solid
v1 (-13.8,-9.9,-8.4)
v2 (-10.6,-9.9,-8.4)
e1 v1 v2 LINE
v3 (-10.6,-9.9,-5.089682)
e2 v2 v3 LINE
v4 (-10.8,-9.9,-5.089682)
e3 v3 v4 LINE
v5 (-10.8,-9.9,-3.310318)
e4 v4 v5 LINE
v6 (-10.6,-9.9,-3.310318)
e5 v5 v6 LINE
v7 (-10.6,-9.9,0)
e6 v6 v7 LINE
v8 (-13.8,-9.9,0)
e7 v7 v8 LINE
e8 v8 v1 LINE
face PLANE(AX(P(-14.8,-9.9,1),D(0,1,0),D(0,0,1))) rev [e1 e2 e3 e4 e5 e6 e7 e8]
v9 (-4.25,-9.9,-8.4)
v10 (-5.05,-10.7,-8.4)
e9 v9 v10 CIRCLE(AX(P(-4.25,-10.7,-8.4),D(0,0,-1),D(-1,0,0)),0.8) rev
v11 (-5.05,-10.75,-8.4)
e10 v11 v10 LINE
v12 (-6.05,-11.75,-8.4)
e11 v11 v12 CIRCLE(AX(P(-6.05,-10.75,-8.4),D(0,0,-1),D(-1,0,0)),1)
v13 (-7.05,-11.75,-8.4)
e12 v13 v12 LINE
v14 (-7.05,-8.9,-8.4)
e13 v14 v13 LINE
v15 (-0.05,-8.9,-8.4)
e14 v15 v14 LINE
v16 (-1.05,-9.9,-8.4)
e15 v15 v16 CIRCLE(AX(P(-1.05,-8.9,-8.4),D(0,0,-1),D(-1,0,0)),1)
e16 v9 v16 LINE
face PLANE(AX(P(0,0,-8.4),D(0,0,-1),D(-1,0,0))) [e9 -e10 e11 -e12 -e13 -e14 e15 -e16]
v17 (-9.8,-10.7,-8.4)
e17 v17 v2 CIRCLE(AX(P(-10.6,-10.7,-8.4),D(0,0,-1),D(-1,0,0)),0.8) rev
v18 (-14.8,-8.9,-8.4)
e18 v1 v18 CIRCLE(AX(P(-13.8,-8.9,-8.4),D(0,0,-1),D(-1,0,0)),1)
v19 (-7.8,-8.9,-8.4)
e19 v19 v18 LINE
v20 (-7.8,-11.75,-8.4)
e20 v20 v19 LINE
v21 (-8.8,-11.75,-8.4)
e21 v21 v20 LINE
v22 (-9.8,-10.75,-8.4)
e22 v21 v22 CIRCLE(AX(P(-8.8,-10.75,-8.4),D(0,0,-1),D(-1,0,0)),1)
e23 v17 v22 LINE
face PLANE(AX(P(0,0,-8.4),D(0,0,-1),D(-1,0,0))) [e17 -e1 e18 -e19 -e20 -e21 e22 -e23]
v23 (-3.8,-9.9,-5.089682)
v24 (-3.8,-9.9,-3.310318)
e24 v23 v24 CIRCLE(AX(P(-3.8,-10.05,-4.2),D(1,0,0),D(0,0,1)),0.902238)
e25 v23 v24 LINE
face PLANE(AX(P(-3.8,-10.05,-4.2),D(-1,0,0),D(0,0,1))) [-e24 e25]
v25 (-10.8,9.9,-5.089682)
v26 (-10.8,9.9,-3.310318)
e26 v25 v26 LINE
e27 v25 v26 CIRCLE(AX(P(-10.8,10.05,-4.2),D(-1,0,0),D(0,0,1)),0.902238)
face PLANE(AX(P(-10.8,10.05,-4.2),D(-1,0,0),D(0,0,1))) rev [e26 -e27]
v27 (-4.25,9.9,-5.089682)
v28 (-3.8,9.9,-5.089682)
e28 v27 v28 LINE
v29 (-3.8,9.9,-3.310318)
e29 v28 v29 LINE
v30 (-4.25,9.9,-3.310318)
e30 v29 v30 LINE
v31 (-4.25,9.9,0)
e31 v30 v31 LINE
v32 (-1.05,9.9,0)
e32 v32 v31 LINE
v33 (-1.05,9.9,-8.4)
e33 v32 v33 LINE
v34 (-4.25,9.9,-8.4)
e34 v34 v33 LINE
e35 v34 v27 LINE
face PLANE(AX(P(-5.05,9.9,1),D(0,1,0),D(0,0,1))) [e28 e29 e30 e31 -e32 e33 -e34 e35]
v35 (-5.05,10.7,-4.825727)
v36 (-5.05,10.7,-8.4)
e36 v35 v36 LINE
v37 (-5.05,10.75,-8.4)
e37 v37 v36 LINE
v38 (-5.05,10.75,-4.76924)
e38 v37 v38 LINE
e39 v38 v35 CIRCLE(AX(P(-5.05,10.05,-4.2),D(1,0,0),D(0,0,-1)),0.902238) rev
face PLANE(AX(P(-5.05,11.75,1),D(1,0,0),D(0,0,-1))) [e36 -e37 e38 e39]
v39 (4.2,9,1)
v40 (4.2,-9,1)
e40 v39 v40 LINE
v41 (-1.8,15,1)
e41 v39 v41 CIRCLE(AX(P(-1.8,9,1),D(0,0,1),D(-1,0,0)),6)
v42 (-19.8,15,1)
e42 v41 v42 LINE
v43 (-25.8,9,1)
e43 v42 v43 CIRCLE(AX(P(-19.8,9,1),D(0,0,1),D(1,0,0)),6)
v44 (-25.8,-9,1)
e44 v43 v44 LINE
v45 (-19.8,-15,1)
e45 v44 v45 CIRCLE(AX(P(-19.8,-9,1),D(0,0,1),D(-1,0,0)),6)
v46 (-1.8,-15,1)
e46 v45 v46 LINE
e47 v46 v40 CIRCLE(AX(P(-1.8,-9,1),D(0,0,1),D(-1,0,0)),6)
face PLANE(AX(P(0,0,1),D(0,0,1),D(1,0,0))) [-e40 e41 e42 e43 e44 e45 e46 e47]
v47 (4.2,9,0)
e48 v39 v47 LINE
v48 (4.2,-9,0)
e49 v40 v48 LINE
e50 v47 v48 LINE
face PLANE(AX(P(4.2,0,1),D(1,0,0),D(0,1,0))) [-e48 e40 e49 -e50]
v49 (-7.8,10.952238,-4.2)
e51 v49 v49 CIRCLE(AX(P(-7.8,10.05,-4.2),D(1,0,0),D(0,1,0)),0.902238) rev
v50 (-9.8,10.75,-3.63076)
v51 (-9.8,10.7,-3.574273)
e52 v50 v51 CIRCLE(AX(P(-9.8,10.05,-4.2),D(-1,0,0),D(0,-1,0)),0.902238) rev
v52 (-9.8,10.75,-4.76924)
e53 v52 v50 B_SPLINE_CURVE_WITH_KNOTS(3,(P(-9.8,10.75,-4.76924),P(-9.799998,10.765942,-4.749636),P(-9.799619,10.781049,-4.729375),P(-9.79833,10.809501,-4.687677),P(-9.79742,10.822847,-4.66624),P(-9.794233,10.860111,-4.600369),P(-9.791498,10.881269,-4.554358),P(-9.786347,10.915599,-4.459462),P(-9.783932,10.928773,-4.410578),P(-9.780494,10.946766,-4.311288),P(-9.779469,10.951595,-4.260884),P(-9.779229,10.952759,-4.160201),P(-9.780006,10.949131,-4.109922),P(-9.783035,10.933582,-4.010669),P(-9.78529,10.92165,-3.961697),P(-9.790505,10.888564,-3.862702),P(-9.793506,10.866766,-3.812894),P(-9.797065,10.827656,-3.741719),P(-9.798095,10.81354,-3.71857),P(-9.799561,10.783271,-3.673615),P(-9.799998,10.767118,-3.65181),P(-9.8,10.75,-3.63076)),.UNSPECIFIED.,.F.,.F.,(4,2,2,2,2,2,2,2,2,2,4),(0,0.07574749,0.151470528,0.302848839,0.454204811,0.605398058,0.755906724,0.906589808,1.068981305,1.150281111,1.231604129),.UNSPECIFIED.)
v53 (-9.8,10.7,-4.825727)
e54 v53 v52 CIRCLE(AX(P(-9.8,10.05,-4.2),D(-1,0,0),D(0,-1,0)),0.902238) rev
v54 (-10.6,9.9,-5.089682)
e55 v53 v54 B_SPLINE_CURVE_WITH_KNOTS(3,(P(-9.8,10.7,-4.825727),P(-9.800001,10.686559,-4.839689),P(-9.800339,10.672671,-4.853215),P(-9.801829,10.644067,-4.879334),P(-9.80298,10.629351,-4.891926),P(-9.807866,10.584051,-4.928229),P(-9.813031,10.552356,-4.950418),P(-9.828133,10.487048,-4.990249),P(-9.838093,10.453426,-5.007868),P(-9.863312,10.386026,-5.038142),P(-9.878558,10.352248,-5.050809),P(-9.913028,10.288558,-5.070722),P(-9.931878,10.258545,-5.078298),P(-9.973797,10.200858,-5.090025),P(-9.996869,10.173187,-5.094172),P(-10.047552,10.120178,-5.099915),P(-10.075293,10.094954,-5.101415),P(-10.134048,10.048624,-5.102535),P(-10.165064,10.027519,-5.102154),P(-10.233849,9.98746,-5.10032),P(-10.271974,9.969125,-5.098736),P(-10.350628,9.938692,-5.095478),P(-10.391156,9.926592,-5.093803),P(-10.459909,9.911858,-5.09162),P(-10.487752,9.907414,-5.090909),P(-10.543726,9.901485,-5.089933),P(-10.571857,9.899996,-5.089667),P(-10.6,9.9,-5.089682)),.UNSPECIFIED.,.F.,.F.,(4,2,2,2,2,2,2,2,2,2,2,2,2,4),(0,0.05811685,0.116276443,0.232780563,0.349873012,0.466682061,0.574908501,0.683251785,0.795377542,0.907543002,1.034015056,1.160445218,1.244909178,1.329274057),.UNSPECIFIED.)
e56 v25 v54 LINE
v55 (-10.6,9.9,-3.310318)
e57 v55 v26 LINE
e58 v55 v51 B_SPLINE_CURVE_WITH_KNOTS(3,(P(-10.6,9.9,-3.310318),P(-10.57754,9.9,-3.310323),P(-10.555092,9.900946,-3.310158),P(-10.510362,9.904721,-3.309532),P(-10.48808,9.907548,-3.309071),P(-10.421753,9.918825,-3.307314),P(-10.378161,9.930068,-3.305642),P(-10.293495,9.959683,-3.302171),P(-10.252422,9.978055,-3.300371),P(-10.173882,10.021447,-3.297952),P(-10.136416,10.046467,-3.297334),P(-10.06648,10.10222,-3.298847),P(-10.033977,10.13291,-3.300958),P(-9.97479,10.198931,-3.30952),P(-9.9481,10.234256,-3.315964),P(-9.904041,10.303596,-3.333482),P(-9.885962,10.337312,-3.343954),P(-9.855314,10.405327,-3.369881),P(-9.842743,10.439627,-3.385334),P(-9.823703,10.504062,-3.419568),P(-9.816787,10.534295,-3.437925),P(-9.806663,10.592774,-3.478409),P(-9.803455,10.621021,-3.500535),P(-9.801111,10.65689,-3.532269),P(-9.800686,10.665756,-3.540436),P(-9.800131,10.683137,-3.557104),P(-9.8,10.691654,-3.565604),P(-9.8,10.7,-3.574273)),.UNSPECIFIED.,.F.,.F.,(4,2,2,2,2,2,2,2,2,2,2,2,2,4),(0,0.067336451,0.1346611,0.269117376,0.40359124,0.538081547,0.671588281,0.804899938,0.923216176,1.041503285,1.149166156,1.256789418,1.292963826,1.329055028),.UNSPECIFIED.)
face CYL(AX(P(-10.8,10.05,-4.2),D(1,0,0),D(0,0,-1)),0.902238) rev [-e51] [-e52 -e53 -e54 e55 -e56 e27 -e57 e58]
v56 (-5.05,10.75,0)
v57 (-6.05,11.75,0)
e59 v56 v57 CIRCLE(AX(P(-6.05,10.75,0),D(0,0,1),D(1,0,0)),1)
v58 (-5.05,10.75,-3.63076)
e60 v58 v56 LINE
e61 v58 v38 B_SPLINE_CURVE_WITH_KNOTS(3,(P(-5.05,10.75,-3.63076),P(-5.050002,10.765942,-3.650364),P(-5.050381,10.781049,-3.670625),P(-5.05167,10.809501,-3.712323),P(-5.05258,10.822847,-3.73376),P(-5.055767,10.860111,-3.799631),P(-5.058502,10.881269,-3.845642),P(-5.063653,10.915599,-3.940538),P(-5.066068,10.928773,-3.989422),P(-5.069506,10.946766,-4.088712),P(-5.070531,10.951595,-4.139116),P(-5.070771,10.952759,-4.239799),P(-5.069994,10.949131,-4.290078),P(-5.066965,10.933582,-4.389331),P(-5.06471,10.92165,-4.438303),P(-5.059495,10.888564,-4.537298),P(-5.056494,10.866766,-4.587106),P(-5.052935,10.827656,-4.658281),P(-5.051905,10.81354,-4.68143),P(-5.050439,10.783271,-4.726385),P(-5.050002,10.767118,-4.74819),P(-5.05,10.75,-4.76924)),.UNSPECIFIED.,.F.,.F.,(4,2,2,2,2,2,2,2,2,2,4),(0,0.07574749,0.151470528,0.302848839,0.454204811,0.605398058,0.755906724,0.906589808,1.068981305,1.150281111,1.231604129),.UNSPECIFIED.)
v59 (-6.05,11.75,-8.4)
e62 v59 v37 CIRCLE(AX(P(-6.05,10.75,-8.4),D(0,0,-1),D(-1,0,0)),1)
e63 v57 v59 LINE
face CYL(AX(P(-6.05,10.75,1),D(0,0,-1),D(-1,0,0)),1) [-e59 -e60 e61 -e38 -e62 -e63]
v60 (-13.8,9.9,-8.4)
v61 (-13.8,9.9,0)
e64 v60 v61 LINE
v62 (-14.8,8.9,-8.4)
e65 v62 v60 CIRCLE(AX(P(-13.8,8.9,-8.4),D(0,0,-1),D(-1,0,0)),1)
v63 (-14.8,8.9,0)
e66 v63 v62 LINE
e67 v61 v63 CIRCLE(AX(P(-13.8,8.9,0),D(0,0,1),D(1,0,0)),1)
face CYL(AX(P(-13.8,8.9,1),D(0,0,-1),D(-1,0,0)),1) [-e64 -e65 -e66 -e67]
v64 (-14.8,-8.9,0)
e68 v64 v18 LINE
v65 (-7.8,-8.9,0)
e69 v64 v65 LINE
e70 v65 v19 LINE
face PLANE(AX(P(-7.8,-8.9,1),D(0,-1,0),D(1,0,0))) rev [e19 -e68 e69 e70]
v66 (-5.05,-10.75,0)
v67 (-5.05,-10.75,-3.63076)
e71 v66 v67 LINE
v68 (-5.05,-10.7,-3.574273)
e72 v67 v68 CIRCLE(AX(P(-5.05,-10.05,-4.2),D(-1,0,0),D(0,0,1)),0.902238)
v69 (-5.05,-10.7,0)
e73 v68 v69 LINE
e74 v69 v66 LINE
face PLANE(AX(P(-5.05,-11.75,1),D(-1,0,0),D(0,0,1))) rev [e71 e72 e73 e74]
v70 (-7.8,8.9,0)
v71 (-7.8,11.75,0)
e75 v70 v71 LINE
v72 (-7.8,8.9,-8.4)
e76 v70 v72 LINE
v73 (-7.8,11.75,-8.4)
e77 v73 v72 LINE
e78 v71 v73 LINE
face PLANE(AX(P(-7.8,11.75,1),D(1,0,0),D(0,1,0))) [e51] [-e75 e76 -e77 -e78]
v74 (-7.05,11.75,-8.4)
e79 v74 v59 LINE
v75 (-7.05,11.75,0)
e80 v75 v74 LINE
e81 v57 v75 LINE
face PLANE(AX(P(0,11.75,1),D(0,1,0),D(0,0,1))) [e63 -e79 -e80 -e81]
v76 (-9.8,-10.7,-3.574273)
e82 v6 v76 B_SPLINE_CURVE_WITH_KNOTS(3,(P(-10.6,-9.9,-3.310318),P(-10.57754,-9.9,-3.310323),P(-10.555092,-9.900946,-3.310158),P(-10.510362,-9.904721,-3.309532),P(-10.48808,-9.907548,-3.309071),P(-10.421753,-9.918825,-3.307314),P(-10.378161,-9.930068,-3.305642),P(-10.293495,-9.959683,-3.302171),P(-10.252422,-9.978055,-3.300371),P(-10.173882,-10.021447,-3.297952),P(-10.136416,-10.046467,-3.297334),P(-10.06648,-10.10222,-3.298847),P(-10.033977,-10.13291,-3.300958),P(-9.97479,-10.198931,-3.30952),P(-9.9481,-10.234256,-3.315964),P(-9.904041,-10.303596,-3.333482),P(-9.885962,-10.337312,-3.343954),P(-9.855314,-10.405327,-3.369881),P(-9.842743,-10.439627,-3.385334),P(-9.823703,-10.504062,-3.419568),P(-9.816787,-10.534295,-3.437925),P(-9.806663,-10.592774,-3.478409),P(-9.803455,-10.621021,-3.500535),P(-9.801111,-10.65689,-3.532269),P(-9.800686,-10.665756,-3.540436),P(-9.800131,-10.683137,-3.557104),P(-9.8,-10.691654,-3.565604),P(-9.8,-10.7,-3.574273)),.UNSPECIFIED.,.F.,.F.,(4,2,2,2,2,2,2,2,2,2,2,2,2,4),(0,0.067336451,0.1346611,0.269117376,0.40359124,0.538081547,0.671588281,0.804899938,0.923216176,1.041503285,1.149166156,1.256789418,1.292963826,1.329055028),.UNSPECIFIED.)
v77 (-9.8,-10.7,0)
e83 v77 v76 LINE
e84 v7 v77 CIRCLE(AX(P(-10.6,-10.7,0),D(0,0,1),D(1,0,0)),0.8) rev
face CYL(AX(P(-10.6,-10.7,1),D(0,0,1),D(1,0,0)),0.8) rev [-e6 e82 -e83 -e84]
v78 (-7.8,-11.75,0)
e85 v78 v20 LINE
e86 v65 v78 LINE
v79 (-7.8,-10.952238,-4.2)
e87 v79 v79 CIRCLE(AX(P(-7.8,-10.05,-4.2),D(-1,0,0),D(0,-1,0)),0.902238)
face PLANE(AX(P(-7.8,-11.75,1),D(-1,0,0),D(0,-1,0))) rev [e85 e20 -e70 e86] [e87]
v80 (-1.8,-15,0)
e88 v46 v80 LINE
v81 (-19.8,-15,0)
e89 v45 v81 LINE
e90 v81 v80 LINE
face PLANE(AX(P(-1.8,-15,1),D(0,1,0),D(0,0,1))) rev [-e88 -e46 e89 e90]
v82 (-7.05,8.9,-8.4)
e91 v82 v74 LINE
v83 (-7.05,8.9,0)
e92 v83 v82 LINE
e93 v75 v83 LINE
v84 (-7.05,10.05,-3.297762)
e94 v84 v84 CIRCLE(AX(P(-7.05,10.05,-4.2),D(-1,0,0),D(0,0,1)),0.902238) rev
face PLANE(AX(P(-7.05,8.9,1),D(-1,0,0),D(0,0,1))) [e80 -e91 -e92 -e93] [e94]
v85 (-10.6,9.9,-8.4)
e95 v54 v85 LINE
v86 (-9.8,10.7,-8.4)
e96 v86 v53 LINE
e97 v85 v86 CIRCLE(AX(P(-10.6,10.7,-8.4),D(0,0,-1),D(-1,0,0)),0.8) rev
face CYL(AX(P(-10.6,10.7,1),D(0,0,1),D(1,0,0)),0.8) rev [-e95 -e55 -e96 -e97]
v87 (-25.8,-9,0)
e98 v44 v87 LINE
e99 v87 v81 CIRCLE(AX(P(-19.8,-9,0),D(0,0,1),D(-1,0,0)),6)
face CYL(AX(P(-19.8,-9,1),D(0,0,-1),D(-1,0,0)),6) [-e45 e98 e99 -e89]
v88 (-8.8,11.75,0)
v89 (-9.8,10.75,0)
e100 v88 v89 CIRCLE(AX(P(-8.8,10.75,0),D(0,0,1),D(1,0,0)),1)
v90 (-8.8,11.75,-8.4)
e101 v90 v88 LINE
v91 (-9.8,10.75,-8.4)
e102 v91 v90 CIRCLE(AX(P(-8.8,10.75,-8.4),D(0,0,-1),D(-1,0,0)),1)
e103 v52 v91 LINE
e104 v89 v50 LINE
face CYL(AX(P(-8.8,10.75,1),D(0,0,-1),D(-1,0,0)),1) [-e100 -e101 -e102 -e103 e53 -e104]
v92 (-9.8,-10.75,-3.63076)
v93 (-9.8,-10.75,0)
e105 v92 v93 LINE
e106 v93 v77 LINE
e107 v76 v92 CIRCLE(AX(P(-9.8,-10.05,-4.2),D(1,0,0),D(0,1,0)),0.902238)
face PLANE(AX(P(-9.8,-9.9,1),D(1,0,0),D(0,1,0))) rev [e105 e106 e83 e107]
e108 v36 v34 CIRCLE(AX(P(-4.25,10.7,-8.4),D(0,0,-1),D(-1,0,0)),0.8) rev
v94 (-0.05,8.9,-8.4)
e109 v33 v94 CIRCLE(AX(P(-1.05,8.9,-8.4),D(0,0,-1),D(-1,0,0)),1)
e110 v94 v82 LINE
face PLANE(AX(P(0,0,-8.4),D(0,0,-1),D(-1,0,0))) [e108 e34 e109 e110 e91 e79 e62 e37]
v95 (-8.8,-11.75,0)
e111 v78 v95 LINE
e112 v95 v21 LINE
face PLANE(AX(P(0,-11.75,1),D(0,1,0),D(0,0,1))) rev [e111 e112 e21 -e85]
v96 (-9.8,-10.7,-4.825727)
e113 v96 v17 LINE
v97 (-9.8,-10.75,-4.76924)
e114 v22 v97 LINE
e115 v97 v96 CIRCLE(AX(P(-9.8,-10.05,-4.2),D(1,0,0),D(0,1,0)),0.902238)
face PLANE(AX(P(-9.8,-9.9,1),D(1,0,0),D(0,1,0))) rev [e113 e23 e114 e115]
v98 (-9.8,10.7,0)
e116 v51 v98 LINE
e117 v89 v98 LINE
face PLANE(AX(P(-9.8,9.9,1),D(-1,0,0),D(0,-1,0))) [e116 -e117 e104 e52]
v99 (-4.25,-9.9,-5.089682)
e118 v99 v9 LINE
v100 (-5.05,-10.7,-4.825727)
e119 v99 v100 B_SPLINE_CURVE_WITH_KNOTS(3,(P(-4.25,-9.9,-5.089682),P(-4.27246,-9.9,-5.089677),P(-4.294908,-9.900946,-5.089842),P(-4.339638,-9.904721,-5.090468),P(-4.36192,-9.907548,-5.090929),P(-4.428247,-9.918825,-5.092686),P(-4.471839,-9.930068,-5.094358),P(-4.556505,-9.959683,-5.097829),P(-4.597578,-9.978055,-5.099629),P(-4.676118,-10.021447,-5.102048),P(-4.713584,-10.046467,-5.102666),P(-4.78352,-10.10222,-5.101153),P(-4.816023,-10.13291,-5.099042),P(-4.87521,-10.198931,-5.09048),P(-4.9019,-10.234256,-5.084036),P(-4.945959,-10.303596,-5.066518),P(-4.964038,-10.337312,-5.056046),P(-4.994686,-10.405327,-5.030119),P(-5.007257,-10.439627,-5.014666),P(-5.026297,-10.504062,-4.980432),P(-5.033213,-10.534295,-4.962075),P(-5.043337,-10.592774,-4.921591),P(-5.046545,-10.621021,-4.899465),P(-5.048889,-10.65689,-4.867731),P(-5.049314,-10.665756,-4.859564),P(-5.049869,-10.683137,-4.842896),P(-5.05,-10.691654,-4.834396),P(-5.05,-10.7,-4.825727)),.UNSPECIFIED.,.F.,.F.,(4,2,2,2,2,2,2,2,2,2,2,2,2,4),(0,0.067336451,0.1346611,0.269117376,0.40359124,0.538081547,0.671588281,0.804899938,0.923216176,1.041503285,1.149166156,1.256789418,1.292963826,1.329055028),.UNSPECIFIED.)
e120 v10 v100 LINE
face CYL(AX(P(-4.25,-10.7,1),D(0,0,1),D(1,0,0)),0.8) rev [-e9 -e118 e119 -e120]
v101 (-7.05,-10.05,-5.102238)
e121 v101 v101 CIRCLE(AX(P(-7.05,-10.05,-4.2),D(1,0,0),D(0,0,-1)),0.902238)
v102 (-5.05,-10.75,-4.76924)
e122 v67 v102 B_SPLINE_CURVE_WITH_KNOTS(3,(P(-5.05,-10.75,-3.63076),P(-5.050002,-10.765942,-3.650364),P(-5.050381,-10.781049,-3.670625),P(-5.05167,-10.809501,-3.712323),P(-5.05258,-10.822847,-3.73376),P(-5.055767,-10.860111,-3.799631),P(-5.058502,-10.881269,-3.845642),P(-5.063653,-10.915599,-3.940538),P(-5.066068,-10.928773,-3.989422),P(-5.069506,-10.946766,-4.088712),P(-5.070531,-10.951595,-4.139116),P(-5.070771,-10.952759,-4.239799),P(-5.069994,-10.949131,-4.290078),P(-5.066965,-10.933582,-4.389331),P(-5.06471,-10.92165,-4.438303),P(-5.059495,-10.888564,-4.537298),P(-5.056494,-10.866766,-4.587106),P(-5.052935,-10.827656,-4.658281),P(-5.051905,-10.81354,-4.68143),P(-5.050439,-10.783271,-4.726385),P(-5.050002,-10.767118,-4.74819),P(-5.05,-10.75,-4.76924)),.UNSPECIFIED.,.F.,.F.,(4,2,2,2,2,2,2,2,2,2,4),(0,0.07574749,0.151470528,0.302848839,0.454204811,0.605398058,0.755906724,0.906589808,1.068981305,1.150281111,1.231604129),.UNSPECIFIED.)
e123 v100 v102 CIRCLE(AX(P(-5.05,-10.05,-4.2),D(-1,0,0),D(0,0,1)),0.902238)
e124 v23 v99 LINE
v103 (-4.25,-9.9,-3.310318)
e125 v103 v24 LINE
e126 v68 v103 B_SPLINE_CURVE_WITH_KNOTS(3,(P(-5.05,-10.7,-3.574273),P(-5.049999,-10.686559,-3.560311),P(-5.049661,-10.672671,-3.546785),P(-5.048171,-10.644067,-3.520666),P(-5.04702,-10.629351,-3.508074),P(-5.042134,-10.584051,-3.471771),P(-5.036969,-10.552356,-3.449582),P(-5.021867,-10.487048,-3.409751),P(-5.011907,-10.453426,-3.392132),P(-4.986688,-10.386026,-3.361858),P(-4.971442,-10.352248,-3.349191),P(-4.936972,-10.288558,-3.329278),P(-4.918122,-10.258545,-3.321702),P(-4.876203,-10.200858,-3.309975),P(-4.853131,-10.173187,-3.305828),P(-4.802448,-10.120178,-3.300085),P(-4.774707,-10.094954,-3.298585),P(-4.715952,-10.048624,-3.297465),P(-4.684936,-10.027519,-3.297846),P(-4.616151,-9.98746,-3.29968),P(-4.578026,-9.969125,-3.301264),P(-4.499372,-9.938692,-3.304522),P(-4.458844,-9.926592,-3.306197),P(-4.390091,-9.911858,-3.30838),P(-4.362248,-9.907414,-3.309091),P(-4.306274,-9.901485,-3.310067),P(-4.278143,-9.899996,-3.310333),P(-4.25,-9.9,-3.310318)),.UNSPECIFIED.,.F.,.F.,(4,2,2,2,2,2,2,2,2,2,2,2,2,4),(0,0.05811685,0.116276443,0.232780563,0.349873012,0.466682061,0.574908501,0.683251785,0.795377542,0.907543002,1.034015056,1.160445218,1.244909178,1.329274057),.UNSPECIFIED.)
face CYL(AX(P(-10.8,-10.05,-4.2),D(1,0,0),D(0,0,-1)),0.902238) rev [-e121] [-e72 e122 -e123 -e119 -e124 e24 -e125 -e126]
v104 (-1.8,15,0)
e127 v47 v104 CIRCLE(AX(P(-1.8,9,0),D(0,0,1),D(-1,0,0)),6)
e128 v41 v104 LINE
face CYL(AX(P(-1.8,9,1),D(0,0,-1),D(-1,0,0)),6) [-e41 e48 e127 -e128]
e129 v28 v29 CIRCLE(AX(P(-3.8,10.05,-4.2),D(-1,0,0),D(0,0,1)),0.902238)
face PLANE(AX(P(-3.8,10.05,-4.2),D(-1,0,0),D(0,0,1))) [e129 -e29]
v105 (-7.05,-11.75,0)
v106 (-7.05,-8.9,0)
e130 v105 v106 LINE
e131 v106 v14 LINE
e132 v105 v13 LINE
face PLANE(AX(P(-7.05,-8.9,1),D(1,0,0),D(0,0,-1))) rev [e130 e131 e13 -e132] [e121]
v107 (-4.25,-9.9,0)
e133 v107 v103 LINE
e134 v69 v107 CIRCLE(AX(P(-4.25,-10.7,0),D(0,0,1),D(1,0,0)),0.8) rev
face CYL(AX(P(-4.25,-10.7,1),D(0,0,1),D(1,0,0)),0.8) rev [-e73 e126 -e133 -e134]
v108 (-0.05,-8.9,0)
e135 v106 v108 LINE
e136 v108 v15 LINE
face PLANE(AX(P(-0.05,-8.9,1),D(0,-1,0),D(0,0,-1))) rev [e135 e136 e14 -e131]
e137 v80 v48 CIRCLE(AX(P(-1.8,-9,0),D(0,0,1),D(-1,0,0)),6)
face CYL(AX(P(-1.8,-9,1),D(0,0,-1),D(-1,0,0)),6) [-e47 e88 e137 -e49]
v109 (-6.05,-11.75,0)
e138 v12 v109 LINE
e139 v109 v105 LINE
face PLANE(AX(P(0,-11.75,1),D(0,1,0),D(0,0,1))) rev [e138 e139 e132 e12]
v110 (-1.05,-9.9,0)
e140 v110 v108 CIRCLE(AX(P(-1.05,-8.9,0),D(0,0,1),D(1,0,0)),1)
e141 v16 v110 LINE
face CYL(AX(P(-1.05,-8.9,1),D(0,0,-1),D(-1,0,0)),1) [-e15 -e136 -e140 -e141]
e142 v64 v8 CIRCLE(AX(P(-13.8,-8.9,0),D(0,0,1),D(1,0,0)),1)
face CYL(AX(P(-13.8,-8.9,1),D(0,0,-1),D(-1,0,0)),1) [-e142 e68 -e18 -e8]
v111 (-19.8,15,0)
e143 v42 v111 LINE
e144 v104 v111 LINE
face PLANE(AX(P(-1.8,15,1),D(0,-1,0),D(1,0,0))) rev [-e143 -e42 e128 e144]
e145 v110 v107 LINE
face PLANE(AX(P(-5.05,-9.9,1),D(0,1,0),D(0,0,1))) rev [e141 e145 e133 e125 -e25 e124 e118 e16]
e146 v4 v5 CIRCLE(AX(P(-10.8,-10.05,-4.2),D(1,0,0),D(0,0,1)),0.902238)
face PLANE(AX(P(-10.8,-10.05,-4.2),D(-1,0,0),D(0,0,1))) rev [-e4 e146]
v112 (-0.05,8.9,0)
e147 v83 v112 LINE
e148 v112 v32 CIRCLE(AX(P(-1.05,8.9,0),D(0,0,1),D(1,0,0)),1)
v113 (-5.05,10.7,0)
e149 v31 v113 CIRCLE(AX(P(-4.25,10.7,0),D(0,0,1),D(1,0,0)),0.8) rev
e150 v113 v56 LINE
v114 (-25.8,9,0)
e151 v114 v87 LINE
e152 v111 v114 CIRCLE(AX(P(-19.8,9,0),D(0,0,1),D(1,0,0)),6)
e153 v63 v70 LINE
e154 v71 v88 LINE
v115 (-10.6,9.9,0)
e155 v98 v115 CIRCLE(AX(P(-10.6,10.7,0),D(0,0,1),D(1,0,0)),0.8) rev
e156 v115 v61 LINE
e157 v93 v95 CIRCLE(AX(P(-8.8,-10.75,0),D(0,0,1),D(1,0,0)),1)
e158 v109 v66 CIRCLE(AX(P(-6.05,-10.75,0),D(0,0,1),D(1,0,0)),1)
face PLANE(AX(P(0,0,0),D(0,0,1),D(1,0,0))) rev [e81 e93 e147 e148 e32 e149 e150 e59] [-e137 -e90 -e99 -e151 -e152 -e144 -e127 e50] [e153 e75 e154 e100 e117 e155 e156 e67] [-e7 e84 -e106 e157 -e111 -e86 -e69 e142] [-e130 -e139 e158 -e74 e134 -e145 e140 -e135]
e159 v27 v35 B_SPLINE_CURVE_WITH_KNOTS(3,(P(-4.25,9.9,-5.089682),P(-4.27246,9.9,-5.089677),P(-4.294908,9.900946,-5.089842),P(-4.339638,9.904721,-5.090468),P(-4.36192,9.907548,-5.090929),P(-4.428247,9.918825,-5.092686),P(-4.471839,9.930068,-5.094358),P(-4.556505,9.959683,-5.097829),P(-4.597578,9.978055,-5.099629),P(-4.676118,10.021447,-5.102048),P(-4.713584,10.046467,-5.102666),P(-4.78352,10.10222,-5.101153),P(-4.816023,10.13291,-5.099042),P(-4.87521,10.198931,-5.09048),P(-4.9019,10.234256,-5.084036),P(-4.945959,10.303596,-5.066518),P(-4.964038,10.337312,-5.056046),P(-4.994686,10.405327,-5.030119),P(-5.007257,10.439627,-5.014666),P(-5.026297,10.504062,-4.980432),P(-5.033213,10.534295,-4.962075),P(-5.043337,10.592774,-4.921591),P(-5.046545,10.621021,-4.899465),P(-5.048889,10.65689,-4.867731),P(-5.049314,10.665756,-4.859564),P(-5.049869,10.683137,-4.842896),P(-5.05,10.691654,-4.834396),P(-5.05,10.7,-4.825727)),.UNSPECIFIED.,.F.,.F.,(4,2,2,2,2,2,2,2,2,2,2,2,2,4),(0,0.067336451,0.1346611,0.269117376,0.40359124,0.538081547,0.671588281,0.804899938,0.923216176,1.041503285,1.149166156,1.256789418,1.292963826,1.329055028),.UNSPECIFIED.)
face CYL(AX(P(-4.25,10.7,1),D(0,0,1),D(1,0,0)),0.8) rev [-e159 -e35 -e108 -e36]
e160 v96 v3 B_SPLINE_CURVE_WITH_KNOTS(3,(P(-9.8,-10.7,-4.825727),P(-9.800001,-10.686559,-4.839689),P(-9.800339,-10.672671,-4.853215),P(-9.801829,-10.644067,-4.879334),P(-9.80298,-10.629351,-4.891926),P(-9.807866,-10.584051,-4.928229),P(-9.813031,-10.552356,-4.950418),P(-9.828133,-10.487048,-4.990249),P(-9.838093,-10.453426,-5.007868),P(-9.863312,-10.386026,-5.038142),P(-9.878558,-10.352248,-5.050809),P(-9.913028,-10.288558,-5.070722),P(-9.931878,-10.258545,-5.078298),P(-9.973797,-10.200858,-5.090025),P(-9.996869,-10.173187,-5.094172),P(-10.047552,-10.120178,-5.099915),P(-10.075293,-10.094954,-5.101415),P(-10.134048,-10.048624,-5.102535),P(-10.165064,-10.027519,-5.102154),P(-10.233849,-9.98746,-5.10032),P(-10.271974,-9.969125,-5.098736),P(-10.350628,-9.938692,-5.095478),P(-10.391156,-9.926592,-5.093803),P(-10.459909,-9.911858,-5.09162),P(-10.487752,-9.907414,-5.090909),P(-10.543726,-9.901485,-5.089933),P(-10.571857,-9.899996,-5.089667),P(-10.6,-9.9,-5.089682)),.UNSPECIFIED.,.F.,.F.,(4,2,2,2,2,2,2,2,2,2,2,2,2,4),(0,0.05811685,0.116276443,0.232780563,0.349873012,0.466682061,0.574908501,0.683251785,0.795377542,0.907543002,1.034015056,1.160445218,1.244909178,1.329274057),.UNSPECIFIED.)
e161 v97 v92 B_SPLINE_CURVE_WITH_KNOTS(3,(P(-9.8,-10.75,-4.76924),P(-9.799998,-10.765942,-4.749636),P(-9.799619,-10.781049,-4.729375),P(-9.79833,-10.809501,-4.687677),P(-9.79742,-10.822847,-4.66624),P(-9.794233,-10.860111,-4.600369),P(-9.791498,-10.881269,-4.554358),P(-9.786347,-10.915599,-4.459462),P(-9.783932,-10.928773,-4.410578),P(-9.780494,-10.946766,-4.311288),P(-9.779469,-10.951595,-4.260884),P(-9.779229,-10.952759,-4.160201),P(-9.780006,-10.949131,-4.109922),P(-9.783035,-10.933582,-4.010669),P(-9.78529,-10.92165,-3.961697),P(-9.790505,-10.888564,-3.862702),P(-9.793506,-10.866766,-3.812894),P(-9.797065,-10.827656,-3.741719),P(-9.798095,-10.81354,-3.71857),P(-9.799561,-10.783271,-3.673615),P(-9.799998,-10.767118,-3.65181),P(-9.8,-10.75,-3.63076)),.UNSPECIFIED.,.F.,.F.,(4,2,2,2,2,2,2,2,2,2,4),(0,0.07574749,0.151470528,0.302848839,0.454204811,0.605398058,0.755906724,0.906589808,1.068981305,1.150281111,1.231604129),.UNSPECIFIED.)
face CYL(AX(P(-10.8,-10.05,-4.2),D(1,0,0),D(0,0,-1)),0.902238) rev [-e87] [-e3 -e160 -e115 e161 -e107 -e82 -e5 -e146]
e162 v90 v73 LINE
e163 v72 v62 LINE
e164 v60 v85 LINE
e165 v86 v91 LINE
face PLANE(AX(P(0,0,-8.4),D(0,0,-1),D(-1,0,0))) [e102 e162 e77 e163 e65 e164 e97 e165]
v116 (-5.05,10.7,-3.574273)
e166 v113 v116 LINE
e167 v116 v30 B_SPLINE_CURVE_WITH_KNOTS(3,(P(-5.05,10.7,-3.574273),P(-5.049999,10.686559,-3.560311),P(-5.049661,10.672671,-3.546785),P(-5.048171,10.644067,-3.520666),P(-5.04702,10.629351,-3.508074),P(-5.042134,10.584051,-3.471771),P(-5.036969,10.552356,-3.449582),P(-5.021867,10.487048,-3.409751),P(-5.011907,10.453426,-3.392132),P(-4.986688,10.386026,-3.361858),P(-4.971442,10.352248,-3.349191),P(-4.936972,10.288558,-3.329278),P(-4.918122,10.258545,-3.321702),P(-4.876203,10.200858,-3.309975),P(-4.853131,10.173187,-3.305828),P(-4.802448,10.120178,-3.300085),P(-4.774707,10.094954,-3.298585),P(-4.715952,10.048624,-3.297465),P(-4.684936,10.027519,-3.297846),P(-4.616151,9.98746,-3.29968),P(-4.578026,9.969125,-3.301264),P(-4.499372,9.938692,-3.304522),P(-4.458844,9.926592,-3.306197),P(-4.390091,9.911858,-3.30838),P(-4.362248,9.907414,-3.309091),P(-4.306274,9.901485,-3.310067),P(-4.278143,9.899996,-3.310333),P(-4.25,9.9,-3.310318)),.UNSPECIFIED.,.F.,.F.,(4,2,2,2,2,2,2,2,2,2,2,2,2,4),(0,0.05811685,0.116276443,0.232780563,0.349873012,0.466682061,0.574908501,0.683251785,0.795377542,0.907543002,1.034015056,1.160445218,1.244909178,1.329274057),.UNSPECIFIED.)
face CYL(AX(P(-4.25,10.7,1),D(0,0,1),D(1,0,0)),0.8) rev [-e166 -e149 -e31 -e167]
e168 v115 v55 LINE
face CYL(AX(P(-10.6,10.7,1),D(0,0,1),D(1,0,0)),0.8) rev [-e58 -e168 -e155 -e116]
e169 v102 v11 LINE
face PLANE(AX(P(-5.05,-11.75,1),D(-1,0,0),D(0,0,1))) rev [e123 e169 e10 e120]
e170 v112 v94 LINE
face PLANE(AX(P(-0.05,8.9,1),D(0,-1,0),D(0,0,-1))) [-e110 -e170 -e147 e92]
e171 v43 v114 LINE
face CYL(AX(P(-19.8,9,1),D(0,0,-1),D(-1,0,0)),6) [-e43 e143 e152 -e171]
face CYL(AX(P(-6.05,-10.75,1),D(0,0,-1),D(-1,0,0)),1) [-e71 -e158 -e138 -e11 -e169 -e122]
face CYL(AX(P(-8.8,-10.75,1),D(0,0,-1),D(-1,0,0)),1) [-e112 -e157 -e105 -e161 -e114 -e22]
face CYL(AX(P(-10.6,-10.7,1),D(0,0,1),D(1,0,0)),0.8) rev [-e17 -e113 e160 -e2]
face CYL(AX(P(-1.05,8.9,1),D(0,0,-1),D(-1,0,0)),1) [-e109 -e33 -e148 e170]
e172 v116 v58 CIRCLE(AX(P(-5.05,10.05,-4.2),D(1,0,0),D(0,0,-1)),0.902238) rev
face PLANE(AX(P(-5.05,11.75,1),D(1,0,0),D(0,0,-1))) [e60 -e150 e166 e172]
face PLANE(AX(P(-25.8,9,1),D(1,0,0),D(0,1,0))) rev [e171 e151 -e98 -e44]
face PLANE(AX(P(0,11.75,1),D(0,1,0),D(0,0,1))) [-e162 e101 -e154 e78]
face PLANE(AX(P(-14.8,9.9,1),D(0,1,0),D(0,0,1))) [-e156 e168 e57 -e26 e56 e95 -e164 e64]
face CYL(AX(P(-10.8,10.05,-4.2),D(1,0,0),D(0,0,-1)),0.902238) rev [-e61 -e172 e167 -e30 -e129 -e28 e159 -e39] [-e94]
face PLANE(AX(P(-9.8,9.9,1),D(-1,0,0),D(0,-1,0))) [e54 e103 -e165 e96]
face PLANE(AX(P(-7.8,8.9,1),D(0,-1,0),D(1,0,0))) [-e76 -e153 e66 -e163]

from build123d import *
from OCP.BRepFilletAPI import BRepFilletAPI_MakeFillet

# Parameters (mm, degrees)
SKETCH1_W           = 8.4
SKETCH1_H           = 23.5
BOSS_EXTRUDE1_DEPTH = 1
SKETCH1_3_W         = 11.6
SKETCH1_3_H         = 23.5
BOSS_EXTRUDE4_DEPTH = 1
BOSS_EXTRUDE5_START = -1
BOSS_EXTRUDE5_DEPTH = 9.4
FILLET2_R           = 1
FILLET2_R_2         = 0.8
FILLET3_R           = 5
CUT_EXTRUDE1_START  = -6
SKETCH4_R           = 0.902238409
CUT_EXTRUDE1_DEPTH  = 7
BOSS_EXTRUDE8_DEPTH = 1


# Read off the part's stored shape, not the designer's step: Mirror1
with BuildPart() as part:
    # Sketch1 → Boss-Extrude1 (new body)
    with BuildSketch(Plane.XY):
        Rectangle(SKETCH1_W, SKETCH1_H)
    extrude(amount=BOSS_EXTRUDE1_DEPTH)

    # Sketch1<3> → Boss-Extrude4 (add)
    with BuildSketch(Plane.XY):
        with Locations((-10, 0)):
            Rectangle(SKETCH1_3_W, SKETCH1_3_H)
    extrude(amount=BOSS_EXTRUDE4_DEPTH)

    # Sketch3 → Boss-Extrude5 (add)
    with BuildSketch(Plane(origin=(0, 0, 0), x_dir=(-1, 0, 0), z_dir=(0, 0, -1)).offset(BOSS_EXTRUDE5_START)):
        Polygon((0.05, 8.9), (7.05, 8.9), (7.05, 11.75), (5.05, 11.75), (5.05, 9.9), (0.05, 9.9), align=None)
        Polygon((7.8, 11.75), (7.8, 8.9), (14.8, 8.9), (14.8, 9.9), (9.8, 9.9), (9.8, 11.75), align=None)
    extrude(amount=BOSS_EXTRUDE5_DEPTH)

    # Fillet2
    fillet2_edges_1 = [part.edges().sort_by_distance(p)[0] for p in [
        (-9.8, 11.75, -4.2),
        (-5.05, 11.75, -4.2),
        (-0.05, 9.9, -4.2),
        (-14.8, 9.9, -4.2),
    ]]
    fillet2_edges_2 = [part.edges().sort_by_distance(p)[0] for p in [
        (-9.8, 9.9, -4.2),
        (-5.05, 9.9, -4.2),
    ]]
    fillet2 = BRepFilletAPI_MakeFillet(part.part.solid().wrapped)
    for e in fillet2_edges_1:
        fillet2.Add(FILLET2_R - 0.0001, e.wrapped)
    for e in fillet2_edges_2:
        fillet2.Add(FILLET2_R_2 - 0.0001, e.wrapped)
    add(Compound.cast(fillet2.Shape()), mode=Mode.REPLACE)  # a hair under: the kernel refuses the full size

    # Fillet3
    fillet3_edges = [part.edges().sort_by_distance(p)[0] for p in [
        (-15.8, 11.75, 0.5),
        (-15.8, -11.75, 0.5),
        (4.2, -11.75, 0.5),
        (4.2, 11.75, 0.5),
    ]]
    fillet(fillet3_edges, radius=FILLET3_R)

    # Sketch4 → Cut-Extrude1 (cut)
    with BuildSketch(Plane.ZY.offset(9.8).offset(CUT_EXTRUDE1_START)):
        with Locations(Location((-4.2, 10.05, 0), (0, 0, 189.57004168))):
            Circle(SKETCH4_R)
    extrude(amount=CUT_EXTRUDE1_DEPTH, mode=Mode.SUBTRACT)

    # Mirror1: part across plane


with BuildPart() as part_1:
    add(part.part)
    add(part.part.mirror(Plane.ZX))

    # Sketch7 → Boss-Extrude8 (add)
    with BuildSketch(Plane.XY):
        with BuildLine():
            Line((-1.8, 15), (-19.8, 15))
            ThreePointArc((-19.8, 15), (-24.042640687, 13.242640687), (-25.8, 9))
            Line((-25.8, 9), (-25.8, -9))
            ThreePointArc((-25.8, -9), (-24.042640687, -13.242640687), (-19.8, -15))
            Line((-19.8, -15), (-1.8, -15))
            ThreePointArc((-1.8, -15), (2.442640687, -13.242640687), (4.2, -9))
            Line((4.2, -9), (4.2, 9))
            ThreePointArc((4.2, 9), (2.442640687, 13.242640687), (-1.8, 15))
        make_face()
    extrude(amount=BOSS_EXTRUDE8_DEPTH)


solid = part_1.part
